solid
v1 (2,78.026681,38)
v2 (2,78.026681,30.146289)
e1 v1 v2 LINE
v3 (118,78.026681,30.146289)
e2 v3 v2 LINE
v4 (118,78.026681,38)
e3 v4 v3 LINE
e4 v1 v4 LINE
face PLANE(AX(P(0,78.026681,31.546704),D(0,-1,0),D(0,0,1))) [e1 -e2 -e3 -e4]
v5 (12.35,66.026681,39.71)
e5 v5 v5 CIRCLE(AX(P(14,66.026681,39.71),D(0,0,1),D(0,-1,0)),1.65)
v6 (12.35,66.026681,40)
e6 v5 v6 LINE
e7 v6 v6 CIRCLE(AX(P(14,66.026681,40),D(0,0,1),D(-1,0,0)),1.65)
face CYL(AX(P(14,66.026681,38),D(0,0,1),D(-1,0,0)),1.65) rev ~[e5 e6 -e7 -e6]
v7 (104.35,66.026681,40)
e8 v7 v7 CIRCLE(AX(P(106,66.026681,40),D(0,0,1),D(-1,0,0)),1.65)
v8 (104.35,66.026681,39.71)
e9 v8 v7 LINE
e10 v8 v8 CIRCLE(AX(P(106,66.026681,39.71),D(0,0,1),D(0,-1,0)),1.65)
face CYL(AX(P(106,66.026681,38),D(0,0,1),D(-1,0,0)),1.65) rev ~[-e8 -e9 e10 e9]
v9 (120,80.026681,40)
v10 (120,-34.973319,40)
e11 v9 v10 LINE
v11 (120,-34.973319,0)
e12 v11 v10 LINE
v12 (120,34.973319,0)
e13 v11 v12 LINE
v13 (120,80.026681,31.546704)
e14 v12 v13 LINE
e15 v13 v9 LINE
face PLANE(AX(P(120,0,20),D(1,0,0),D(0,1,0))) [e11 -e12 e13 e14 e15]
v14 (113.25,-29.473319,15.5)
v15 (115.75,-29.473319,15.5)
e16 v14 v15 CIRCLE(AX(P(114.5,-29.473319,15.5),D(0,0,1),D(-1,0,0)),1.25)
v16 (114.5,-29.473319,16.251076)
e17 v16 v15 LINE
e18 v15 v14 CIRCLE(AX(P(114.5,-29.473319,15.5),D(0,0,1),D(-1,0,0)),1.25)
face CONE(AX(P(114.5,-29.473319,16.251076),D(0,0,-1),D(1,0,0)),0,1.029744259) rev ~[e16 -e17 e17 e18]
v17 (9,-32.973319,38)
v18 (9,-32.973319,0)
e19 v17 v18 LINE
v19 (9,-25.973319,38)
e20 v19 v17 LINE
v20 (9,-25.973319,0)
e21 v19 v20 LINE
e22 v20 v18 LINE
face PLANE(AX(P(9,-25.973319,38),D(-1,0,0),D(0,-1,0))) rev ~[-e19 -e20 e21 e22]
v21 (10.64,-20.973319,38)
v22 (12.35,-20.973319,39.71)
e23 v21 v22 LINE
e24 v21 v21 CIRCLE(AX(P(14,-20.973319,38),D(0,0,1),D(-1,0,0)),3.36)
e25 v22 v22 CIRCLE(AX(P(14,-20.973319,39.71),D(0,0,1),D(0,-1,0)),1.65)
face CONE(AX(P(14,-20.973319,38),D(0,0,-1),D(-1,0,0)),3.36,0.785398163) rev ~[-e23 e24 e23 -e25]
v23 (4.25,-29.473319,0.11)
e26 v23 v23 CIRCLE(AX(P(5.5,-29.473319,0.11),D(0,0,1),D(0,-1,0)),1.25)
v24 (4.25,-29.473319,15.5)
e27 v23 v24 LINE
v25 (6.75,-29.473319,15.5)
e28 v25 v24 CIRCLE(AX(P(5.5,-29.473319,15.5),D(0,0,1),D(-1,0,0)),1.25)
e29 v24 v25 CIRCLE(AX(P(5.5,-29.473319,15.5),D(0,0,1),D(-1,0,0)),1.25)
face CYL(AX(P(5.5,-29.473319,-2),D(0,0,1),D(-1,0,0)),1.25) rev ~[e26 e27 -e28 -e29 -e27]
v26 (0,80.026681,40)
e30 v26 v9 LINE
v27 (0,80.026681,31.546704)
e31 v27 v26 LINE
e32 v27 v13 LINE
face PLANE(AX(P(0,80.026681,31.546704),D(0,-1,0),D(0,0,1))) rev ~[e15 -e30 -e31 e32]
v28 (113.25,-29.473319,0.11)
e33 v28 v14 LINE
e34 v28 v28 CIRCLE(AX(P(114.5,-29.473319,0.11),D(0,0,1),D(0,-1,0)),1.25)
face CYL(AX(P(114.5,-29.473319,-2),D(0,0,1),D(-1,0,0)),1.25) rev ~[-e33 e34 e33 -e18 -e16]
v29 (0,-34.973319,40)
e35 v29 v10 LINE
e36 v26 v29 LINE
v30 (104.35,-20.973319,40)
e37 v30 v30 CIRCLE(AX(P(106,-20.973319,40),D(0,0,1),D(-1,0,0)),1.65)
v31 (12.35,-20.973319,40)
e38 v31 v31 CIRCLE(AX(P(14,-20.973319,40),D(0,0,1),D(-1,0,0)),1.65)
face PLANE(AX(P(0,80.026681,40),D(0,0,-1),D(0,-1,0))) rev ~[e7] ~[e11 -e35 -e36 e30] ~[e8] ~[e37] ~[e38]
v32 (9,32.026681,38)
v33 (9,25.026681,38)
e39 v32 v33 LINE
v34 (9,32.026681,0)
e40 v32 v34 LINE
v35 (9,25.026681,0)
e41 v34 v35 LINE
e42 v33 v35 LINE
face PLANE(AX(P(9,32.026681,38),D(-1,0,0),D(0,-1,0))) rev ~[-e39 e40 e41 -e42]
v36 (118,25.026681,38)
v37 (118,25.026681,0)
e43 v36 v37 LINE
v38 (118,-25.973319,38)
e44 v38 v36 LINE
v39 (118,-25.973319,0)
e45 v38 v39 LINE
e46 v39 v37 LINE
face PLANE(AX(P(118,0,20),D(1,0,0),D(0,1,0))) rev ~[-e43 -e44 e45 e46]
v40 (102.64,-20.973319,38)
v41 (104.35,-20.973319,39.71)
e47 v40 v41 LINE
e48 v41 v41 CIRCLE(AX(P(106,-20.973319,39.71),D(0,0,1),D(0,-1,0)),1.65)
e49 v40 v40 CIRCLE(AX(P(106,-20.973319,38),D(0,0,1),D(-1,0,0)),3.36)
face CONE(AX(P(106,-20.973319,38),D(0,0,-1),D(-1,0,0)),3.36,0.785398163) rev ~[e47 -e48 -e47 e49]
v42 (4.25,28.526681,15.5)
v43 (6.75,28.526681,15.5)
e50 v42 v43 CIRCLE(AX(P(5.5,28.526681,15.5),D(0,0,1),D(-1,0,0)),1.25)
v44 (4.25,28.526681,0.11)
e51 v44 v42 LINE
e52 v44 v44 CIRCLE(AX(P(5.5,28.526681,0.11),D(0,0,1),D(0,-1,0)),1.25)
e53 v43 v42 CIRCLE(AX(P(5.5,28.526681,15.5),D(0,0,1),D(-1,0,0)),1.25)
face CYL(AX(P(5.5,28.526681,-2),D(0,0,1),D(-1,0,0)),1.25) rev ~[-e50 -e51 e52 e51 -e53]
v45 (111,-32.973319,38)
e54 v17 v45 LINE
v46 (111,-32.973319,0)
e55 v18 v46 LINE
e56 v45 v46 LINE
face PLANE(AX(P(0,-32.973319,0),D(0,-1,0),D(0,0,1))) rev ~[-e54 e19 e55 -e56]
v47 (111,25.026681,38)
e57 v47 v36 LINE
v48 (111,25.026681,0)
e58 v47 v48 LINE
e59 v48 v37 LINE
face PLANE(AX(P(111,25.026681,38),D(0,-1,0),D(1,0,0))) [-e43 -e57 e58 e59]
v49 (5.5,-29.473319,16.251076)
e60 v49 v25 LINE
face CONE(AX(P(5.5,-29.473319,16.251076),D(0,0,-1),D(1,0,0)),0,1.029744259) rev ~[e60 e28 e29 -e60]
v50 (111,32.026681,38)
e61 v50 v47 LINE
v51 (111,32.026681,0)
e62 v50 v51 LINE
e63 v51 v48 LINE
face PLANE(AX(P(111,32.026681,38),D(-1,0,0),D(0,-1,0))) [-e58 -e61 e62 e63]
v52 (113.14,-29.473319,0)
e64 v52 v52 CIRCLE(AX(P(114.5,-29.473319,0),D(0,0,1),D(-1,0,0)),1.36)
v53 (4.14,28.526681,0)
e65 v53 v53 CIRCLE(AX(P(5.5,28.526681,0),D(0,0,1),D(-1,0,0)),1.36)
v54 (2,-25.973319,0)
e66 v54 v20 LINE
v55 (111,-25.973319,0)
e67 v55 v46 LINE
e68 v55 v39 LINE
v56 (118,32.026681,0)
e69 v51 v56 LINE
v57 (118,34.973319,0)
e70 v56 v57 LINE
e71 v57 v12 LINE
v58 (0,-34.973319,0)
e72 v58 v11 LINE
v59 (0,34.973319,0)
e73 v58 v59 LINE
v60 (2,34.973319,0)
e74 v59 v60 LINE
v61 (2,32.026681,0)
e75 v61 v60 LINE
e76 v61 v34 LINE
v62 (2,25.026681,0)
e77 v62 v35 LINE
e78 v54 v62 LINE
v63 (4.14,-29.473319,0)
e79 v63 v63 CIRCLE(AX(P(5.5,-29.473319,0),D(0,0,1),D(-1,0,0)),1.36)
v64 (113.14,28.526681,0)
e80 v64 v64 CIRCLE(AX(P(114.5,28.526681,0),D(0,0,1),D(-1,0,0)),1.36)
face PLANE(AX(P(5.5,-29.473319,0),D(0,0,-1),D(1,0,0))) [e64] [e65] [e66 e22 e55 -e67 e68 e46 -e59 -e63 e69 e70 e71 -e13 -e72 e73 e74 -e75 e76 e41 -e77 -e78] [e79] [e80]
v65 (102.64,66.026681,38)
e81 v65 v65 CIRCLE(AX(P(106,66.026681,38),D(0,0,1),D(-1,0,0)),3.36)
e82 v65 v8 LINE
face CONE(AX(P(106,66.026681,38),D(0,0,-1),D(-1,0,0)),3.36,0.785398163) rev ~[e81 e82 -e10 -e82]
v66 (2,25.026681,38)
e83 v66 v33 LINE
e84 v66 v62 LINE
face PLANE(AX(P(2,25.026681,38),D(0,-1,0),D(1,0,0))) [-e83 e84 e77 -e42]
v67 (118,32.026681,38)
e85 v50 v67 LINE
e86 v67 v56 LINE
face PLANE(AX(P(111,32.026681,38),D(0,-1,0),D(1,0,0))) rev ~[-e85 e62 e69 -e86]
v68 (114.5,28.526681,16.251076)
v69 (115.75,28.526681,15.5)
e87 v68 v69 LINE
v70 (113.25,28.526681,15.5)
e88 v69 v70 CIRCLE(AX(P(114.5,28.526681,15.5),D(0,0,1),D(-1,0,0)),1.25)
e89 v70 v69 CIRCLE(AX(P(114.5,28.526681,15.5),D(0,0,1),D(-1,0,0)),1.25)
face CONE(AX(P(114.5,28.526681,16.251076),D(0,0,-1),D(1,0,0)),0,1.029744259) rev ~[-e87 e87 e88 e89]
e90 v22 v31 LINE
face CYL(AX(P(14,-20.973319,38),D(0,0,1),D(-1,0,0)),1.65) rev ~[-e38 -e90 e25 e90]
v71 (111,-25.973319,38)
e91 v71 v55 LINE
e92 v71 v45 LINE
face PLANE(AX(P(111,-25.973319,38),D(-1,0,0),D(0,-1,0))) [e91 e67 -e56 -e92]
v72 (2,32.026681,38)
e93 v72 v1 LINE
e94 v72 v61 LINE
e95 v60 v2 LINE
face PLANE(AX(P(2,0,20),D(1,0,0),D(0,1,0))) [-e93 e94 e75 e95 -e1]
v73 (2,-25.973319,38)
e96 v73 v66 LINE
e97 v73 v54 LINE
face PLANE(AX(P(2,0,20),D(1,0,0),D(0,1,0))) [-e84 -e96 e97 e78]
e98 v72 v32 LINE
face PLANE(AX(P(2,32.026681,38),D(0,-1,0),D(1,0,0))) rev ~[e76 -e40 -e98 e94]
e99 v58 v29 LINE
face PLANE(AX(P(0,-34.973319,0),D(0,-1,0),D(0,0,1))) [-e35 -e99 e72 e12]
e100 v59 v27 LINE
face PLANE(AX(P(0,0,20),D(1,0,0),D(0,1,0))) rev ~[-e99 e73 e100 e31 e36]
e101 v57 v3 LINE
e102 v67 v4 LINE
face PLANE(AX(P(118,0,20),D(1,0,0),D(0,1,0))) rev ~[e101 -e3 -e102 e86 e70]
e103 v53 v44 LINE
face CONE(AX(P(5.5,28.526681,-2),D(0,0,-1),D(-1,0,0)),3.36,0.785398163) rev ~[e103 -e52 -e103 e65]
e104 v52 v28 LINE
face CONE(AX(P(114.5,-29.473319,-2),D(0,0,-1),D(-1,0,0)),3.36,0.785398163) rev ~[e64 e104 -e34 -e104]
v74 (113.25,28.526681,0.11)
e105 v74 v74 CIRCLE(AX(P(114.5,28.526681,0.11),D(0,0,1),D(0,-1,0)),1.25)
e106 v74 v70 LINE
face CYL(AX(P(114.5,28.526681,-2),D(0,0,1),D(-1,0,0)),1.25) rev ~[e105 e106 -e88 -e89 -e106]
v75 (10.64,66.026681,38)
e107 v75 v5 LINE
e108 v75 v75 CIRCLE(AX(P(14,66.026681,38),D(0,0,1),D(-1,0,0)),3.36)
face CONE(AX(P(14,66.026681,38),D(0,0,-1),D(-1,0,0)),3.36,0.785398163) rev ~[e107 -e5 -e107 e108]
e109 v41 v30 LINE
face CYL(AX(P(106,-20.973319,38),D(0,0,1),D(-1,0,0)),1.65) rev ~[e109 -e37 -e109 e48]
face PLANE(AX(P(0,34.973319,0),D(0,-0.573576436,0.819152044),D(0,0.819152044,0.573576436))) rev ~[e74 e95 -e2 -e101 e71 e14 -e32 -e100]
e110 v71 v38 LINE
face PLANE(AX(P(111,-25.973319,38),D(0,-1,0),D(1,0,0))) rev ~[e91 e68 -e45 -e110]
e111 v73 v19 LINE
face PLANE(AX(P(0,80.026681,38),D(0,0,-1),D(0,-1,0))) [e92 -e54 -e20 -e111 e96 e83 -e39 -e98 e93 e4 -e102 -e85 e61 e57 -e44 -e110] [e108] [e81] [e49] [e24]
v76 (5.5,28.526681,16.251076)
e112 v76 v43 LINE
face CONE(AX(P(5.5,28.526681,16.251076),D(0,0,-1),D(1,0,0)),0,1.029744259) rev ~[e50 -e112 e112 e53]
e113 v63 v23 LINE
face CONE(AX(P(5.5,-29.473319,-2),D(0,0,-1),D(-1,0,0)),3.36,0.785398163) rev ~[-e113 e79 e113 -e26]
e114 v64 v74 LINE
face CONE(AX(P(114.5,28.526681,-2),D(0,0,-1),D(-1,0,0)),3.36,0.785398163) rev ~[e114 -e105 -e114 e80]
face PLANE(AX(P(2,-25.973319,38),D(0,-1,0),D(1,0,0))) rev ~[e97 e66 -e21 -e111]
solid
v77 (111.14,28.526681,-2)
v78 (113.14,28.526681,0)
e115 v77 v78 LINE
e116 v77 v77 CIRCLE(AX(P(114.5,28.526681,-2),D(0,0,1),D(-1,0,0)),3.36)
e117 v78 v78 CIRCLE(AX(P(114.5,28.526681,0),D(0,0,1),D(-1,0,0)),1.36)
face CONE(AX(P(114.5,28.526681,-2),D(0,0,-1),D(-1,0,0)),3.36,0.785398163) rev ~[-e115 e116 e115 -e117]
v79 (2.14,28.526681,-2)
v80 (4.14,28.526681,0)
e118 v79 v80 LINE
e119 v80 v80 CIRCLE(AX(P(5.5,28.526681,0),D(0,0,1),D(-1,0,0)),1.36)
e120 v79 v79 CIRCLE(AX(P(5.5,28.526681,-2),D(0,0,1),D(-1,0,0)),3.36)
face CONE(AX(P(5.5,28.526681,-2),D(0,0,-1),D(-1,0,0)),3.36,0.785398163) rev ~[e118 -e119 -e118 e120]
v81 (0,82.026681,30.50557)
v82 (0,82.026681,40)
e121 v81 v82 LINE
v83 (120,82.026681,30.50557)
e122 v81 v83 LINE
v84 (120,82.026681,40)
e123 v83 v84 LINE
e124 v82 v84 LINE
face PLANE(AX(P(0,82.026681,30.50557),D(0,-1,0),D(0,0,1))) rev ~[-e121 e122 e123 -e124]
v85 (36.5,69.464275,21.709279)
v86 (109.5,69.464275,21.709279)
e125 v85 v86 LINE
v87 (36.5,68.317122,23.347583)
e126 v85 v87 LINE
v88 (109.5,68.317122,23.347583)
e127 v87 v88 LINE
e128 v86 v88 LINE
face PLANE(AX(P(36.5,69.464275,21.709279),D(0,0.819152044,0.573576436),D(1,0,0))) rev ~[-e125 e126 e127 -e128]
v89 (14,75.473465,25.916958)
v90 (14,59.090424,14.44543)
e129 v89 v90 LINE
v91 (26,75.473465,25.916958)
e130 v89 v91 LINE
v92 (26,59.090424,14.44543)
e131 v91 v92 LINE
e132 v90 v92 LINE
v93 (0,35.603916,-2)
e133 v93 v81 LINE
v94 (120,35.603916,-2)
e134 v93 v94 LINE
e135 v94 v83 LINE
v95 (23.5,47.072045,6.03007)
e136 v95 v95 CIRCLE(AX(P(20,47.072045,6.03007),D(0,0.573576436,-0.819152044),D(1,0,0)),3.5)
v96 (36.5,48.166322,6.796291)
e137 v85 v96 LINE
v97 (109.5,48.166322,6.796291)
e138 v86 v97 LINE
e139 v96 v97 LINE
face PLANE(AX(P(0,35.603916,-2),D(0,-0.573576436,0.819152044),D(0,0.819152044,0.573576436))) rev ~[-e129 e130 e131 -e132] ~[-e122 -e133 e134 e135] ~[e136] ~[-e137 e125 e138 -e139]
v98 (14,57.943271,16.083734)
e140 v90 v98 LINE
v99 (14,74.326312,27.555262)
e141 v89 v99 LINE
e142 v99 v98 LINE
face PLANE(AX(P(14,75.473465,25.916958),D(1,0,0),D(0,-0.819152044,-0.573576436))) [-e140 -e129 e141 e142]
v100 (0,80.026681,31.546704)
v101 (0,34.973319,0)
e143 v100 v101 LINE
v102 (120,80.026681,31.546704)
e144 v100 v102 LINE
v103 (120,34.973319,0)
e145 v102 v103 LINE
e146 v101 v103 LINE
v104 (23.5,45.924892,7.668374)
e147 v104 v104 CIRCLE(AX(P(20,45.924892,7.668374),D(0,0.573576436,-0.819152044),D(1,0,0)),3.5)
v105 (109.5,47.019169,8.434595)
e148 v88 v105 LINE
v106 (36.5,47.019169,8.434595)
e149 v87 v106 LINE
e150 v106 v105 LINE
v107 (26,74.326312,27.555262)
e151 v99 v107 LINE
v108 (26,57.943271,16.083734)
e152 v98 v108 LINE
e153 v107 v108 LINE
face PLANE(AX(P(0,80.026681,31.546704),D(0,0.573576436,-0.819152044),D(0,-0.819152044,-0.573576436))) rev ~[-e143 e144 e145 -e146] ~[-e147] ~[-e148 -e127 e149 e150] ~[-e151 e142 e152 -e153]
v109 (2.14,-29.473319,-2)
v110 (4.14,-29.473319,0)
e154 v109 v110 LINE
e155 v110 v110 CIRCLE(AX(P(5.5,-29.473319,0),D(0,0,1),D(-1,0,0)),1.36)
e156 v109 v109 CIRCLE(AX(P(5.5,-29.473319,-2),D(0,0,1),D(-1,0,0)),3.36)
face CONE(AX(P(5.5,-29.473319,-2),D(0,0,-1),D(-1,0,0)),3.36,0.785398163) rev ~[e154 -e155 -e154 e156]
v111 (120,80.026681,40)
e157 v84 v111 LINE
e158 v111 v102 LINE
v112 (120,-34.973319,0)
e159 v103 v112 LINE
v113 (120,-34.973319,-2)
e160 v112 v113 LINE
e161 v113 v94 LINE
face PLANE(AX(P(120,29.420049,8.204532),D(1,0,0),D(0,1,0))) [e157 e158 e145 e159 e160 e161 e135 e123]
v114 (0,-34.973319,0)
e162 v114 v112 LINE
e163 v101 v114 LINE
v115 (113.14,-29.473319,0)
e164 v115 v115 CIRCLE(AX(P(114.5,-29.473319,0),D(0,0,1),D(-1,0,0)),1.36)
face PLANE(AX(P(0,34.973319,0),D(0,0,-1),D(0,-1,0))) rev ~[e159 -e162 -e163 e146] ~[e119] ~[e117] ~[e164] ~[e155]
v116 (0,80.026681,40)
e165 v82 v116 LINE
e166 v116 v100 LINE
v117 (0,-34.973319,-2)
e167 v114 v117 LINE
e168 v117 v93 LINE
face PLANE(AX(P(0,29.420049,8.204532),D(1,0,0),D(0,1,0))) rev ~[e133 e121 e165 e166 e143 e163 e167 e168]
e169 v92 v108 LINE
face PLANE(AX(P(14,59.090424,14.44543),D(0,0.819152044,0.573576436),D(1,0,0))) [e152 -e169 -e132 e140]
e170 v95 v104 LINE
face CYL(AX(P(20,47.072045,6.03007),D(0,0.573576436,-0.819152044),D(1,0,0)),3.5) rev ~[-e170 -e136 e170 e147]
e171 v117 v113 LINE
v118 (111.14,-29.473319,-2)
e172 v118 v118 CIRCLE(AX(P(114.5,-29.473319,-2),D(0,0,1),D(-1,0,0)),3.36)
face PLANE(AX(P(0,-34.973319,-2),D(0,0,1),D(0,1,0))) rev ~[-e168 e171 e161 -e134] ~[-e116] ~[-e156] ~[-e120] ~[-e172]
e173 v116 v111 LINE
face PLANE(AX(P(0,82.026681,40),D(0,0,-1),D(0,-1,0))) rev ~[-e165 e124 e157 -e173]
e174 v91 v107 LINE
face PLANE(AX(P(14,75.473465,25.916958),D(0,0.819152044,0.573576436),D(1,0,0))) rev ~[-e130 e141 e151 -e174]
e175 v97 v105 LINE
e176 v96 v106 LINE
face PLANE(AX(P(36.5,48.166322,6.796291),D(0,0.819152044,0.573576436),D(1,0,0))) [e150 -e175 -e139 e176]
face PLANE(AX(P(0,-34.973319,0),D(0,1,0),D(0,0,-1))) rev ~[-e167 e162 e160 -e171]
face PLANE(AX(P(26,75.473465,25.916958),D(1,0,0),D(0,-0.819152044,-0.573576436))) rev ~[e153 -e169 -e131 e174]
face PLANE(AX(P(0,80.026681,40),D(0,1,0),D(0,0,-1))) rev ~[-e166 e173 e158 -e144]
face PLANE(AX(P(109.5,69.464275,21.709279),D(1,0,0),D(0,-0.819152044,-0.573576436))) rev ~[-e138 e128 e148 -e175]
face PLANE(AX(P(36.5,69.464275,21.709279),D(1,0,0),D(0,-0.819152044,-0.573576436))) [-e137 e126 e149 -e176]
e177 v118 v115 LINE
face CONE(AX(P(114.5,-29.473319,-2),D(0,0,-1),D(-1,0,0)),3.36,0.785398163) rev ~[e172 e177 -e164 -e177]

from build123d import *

# Parameters (mm, degrees)
F0_W             = 69.9466375641
F0_H             = 40
F1_DEPTH         = 120
F2_T             = -2
F3_W             = 7
F3_H             = 7
F4_DEPTH         = 38
F5_DEPTH         = 120
F6_W             = 73
F6_H             = 26
F6_R             = 3.5
F6_W_2           = 12
F6_H_2           = 20
F7_DEPTH         = 2
F9_D             = 2.5
F9_DEPTH         = 17.5
F9_CSINK_D       = 6.72
F9_CSINK_ANGLE   = 90
F9_TIP           = 0.7510757738
F9_2_D           = 2.5
F9_2_DEPTH       = 17.5
F9_2_CSINK_D     = 6.72
F9_2_CSINK_ANGLE = 90
F9_2_TIP         = 0.7510757738
F10_D            = 3.3
F10_DEPTH        = 25
F10_CSINK_D      = 6.72
F10_CSINK_ANGLE  = 90
F10_TIP          = 0.9914200214


with BuildPart() as f1:
    # F0 (on Right) → F1 (new body)
    with BuildSketch(Plane.YZ):
        with Locations((0, 20)):
            Rectangle(F0_W, F0_H)
        Polygon((34.9733187821, 40), (34.9733187821, 0), (80.0266812179, 31.5467039993), (80.0266812179, 40), align=None)
    extrude(amount=F1_DEPTH)

    # F2
    f2_openings = [f1.faces().sort_by_distance(p)[0] for p in [
        (60, 0, 0),
        (60, 57.5, 15.773352),
    ]]
    offset(amount=F2_T, openings=f2_openings)

    # F3 (on face) → F4 (join, through all)
    with BuildSketch(Plane(origin=(0, 0, 38), x_dir=(1, 0, 0), z_dir=(0, 0, -1))):
        with Locations((5.5, 29.4733187821)):
            Rectangle(F3_W, F3_H)
        with Locations((114.5, 29.4733187821)):
            Rectangle(F3_W, F3_H)
        with Locations((5.5, -28.5266812179)):
            Rectangle(F3_W, F3_H)
        with Locations((114.5, -28.5266812179)):
            Rectangle(F3_W, F3_H)
    extrude(amount=F4_DEPTH)

    # F9
    with Locations(Plane(origin=(0, 0, -2), x_dir=(1, 0, 0), z_dir=(0, 0, -1))):
        with Locations((114.5, -28.5266812179), (114.5, 29.4733187821), (5.5, 29.4733187821), (5.5, -28.5266812179)):
            CounterSinkHole(F9_D / 2, F9_CSINK_D / 2, depth=F9_DEPTH, counter_sink_angle=F9_CSINK_ANGLE)
            with Locations((0, 0, -(F9_DEPTH + F9_TIP / 2))):  # 118° drill point
                Cone(0, F9_D / 2, F9_TIP, mode=Mode.SUBTRACT)

    # F10
    with Locations(Plane(origin=(0, 0, 38), x_dir=(1, 0, 0), z_dir=(0, 0, -1))):
        with Locations((14, 20.9733187821), (106, 20.9733187821), (106, -66.0266812179), (14, -66.0266812179)):
            CounterSinkHole(F10_D / 2, F10_CSINK_D / 2, depth=F10_DEPTH, counter_sink_angle=F10_CSINK_ANGLE)
            with Locations((0, 0, -(F10_DEPTH + F10_TIP / 2))):  # 118° drill point
                Cone(0, F10_D / 2, F10_TIP, mode=Mode.SUBTRACT)


with BuildPart() as f5:
    # F0 (on Right) → F5 (new body, through all)
    with BuildSketch(Plane.YZ):
        Polygon((80.0266812179, 31.5467039993), (34.9733187821, 0), (-34.9733187821, 0), (-34.9733187821, -2), (35.6039163598, -2), (82.0266812179, 30.5055698982), (82.0266812179, 40), (80.0266812179, 40), align=None)
    extrude(amount=F5_DEPTH)

    # F6 (on face) → F7 (cut, through all)
    with BuildSketch(Plane(origin=(0, 12.6530225125, -18.0703888805), x_dir=(1, 0, 0), z_dir=(0, 0.5735764364, -0.8191520443))):
        with Locations((73, -56.3537338376)):
            Rectangle(F6_W, F6_H)
        with Locations((20, -42.0178679981)):
            Circle(F6_R)
        with Locations((20, -66.689599677)):
            Rectangle(F6_W_2, F6_H_2)
    extrude(amount=-F7_DEPTH, mode=Mode.SUBTRACT)

    # F9#2
    with Locations(Plane(origin=(0, 0, -2), x_dir=(1, 0, 0), z_dir=(0, 0, -1))):
        with Locations((114.5, -28.5266812179), (114.5, 29.4733187821), (5.5, 29.4733187821), (5.5, -28.5266812179)):
            CounterSinkHole(F9_2_D / 2, F9_2_CSINK_D / 2, depth=F9_2_DEPTH, counter_sink_angle=F9_2_CSINK_ANGLE)
            with Locations((0, 0, -(F9_2_DEPTH + F9_2_TIP / 2))):  # 118° drill point
                Cone(0, F9_2_D / 2, F9_2_TIP, mode=Mode.SUBTRACT)


solid = Compound([f1.part, f5.part])
